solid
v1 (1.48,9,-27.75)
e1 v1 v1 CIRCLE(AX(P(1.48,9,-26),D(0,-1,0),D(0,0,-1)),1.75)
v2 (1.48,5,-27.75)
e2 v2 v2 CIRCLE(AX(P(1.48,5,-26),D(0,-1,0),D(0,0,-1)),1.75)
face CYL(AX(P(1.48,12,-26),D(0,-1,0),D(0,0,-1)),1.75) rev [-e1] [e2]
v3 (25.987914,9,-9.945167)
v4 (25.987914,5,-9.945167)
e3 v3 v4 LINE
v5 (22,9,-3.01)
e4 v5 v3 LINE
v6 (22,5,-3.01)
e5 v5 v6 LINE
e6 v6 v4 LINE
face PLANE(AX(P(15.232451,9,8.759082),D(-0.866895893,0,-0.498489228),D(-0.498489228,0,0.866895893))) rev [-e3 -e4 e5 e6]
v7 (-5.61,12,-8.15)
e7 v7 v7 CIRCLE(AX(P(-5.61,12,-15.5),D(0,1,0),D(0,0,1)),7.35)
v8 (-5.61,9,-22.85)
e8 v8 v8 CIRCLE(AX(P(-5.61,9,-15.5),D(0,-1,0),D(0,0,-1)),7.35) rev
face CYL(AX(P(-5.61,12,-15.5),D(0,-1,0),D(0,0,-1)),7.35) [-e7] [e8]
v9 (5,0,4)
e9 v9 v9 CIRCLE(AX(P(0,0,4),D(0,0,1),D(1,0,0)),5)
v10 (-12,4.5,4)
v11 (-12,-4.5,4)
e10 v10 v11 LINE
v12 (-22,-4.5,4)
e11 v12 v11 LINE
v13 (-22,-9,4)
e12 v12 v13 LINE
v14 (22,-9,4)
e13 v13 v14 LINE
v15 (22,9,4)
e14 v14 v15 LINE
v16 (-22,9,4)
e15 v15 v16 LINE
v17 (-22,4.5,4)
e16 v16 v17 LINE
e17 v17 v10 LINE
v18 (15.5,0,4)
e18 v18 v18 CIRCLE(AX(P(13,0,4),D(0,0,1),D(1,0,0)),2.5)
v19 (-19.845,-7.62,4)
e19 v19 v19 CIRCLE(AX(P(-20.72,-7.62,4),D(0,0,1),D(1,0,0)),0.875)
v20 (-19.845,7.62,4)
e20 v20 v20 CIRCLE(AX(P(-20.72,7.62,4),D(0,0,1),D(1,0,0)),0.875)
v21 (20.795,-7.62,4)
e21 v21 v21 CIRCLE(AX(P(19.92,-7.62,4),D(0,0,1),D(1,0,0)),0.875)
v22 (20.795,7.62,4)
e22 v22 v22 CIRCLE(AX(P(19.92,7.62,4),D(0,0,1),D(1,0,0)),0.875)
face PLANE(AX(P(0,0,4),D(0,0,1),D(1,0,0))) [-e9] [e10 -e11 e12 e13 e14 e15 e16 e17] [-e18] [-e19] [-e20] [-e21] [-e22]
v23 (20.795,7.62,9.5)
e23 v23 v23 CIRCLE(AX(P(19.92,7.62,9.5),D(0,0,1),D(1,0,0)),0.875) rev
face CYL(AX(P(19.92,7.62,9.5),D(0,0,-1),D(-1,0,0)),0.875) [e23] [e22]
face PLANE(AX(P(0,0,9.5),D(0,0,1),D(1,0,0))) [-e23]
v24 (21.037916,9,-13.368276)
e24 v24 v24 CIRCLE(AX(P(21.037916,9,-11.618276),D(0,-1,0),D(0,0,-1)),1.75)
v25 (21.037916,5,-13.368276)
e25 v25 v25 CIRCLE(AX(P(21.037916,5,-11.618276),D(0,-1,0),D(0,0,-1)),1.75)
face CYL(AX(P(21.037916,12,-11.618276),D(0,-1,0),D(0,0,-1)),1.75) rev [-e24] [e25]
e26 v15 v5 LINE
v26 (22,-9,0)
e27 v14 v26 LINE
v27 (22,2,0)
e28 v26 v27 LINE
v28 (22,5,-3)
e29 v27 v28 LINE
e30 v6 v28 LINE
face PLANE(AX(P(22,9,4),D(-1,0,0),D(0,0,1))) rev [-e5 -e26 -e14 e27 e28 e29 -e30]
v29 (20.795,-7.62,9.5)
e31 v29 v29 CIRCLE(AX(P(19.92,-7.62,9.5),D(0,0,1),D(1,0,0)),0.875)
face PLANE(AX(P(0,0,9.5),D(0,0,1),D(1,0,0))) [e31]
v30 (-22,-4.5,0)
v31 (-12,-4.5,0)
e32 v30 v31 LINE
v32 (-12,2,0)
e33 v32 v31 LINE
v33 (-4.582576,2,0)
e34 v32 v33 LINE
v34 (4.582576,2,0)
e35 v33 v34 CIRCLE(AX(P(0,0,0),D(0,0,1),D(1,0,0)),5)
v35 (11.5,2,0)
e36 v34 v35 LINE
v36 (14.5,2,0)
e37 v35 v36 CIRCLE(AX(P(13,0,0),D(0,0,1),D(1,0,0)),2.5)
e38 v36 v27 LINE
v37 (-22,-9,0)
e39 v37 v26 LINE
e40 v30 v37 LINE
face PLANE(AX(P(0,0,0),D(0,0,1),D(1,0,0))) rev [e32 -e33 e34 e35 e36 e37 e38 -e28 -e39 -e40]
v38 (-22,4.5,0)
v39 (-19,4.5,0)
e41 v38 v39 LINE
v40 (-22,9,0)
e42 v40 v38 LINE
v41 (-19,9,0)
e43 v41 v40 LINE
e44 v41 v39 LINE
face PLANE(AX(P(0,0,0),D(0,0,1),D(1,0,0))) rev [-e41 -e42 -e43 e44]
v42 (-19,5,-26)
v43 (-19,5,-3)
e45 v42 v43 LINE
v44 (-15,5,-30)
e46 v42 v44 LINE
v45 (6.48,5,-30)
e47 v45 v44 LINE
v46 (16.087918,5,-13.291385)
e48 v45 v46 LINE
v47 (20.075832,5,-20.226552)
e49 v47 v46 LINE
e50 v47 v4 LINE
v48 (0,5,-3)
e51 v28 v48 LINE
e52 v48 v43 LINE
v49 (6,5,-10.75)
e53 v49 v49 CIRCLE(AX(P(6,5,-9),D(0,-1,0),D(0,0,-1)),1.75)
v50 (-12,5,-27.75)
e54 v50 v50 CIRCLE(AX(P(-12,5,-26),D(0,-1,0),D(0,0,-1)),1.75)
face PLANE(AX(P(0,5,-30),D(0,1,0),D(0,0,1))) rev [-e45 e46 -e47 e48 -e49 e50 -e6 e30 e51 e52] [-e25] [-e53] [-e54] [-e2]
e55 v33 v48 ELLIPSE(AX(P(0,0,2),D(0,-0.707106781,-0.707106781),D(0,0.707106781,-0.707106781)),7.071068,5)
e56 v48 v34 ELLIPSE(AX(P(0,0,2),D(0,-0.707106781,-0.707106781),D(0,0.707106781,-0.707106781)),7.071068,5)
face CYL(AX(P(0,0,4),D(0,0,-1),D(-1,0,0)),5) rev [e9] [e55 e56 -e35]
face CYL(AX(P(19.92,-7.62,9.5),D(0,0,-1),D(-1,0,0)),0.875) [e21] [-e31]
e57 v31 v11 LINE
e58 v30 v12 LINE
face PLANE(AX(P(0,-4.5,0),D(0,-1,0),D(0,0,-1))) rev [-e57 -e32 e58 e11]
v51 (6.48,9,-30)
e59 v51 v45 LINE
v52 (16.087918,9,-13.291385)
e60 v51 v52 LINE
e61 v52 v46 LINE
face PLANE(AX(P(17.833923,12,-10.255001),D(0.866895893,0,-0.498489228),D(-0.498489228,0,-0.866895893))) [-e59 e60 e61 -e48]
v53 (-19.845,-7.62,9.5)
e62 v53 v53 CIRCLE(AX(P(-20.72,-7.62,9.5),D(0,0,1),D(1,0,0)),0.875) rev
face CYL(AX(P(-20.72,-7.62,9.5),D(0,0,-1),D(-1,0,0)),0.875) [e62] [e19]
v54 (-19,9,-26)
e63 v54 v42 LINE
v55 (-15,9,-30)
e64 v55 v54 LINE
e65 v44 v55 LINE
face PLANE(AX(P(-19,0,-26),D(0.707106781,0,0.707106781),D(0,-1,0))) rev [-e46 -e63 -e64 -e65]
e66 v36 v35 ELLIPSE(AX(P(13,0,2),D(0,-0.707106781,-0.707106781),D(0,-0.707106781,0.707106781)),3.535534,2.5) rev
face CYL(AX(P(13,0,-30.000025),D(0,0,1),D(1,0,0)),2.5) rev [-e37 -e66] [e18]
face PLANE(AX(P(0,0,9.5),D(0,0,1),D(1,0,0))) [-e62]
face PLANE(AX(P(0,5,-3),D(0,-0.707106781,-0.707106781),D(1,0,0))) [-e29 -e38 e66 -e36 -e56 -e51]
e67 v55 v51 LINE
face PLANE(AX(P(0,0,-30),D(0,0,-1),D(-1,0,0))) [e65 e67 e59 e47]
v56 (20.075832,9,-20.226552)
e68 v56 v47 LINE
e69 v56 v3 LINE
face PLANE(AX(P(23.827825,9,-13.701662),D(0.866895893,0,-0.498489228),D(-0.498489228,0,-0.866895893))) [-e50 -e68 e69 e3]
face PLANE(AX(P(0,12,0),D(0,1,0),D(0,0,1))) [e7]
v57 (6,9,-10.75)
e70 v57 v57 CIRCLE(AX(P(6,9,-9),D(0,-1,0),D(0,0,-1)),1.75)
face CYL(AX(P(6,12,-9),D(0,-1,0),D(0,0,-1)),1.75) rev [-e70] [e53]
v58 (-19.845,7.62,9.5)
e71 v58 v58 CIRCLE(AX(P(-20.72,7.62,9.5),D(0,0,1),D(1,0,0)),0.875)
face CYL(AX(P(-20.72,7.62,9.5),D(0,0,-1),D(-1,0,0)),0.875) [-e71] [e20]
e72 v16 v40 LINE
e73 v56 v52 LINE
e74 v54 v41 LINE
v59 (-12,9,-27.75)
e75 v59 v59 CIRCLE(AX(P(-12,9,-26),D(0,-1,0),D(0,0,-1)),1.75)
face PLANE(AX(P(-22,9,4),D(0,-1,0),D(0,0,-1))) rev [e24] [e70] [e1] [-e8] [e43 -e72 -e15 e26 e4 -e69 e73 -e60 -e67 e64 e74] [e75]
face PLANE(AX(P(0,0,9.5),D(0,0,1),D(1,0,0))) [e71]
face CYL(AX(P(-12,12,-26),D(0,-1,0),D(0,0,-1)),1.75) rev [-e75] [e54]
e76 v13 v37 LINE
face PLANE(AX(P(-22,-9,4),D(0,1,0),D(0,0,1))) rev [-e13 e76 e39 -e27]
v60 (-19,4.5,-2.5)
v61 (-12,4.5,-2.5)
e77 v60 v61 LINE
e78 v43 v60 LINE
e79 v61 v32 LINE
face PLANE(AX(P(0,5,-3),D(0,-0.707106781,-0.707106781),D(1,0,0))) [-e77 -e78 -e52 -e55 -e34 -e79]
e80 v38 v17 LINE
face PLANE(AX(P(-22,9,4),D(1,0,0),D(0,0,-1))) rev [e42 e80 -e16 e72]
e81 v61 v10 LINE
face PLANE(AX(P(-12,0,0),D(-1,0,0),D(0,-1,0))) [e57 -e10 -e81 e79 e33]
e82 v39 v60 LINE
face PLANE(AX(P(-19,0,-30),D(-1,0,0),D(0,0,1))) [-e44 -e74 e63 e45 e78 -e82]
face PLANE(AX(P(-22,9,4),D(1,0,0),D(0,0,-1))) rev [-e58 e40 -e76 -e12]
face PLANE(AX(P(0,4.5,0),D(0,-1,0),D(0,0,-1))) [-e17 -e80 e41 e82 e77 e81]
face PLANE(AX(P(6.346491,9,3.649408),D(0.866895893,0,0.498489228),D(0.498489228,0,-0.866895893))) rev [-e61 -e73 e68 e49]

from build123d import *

# Parameters (mm, degrees)
SKETCH_1_W          = 44
SKETCH_1_H          = 18
SKETCH_1_R          = 5
EXTRUDE_1_DEPTH     = 4
SKETCH_2_W          = 10
SKETCH_2_H          = 9
CUT_EXTRUDE_1_DEPTH = 25.103941586
SKETCH_3_R          = 0.875
EXTRUDE_2_DEPTH     = 5.5
SKETCH_4_W          = 41
SKETCH_4_H          = 4
EXTRUDE_3_DEPTH     = 30
SKETCH_5_R          = 7.35
EXTRUDE_4_DEPTH     = 3
CUT_EXTRUDE_2_DEPTH = 40.749213829
EXTRUDE_6_DEPTH     = 4
SKETCH_8_R          = 1.75
CUT_EXTRUDE_3_DEPTH = 43.087666423
CHAMFER_1_SIZE      = 3
SKETCH_9_R          = 2.5
CUT_EXTRUDE_5_DEPTH = 45.445153447
CHAMFER_2_SIZE      = 4


with BuildPart() as part:
    # Эскиз1 → Бобышка-Вытянуть1 (new body)
    with BuildSketch(Plane.XY):
        Rectangle(SKETCH_1_W, SKETCH_1_H)
        Circle(SKETCH_1_R, mode=Mode.SUBTRACT)
    extrude(amount=EXTRUDE_1_DEPTH)

    # Эскиз2 → Вырез-Вытянуть1 (cut, through all)
    with BuildSketch(Plane.XY.offset(4)):
        with Locations((-17, 0)):
            Rectangle(SKETCH_2_W, SKETCH_2_H)
    extrude(amount=-CUT_EXTRUDE_1_DEPTH, mode=Mode.SUBTRACT)

    # Эскиз3 → Бобышка-Вытянуть2 (add)
    with BuildSketch(Plane.XY.offset(4)):
        with Locations((-20.72, 7.62)):
            Circle(SKETCH_3_R)
        with Locations((-20.72, -7.62)):
            Circle(SKETCH_3_R)
        with Locations((19.92, -7.62)):
            Circle(SKETCH_3_R)
        with Locations((19.92, 7.62)):
            Circle(SKETCH_3_R)
    extrude(amount=EXTRUDE_2_DEPTH)

    # Эскиз4 → Бобышка-Вытянуть3 (add)
    with BuildSketch(Plane(origin=(0, 0, 0), x_dir=(-1, 0, 0), z_dir=(0, 0, -1))):
        with Locations((-1.5, 7)):
            Rectangle(SKETCH_4_W, SKETCH_4_H)
    extrude(amount=EXTRUDE_3_DEPTH)

    # Эскиз5 → Бобышка-Вытянуть4 (add)
    with BuildSketch(Plane(origin=(0, 9, 0), x_dir=(1, 0, 0), z_dir=(0, 1, 0))):
        with Locations(Location((-5.61, 15.5, 0), (0, 0, 90))):
            Circle(SKETCH_5_R)
    extrude(amount=EXTRUDE_4_DEPTH)

    # Эскиз6 → Вырез-Вытянуть2 (cut, through all)
    with BuildSketch(Plane.XZ.offset(-5)):
        Polygon((22, -3.01), (6.48, -30), (22, -30), align=None)
    extrude(amount=-CUT_EXTRUDE_2_DEPTH, mode=Mode.SUBTRACT)

    # Эскиз7 → Бобышка-Вытянуть6 (add)
    with BuildSketch(Plane.XZ.offset(-5)):
        Polygon((25.987913824, -9.945167145), (22, -3.01), (16.087917757, -13.291385293), (20.07583158, -20.226552439), align=None)
    extrude(amount=-EXTRUDE_6_DEPTH)

    # Эскиз8 → Вырез-Вытянуть3 (cut, through all)
    with BuildSketch(Plane.XZ.offset(-5)):
        with Locations(Location((21.03791579, -11.618276219, 0), (0, 0, 270))):
            Circle(SKETCH_8_R)
        with Locations(Location((-12, -26, 0), (0, 0, 270))):
            Circle(SKETCH_8_R)
        with Locations(Location((1.48, -26, 0), (0, 0, 270))):
            Circle(SKETCH_8_R)
        with Locations(Location((6, -9, 0), (0, 0, 270))):
            Circle(SKETCH_8_R)
    extrude(amount=-CUT_EXTRUDE_3_DEPTH, mode=Mode.SUBTRACT)

    # Фаска1
    # the kernel refuses this chamfer: 3 mm, written as the material it adds along each edge
    with BuildSketch(Plane(origin=(2.6e-08, 5, 0), x_dir=(0, -0.9996219169112968, 0.027495876610586372), z_dir=(-1, 0, 0))) as chamfer_1_piece_1_section:
        Polygon((CHAMFER_1_SIZE * 0.999621916911, -CHAMFER_1_SIZE * 0.0274958766106), (-CHAMFER_1_SIZE * 0.0274958766106, -CHAMFER_1_SIZE * 0.999621916911), (0, 0), align=None)
    chamfer_1_piece_1 = extrude(amount=26.71504899, mode=Mode.PRIVATE)
    chamfer_1_piece_1 = split(chamfer_1_piece_1, bisect_by=Plane(origin=(-12, 3.70825936, -0.85412968), z_dir=(1, 0, 0)), keep=Keep.TOP, mode=Mode.PRIVATE)
    chamfer_1_piece_1 = chamfer_1_piece_1 - Plane(origin=(0, 0, -0.85412968), x_dir=(1, 0, 0), z_dir=(0, 0, -1)) * Cylinder(5, 66, mode=Mode.PRIVATE)
    add(chamfer_1_piece_1)
    with BuildSketch(Plane(origin=(2.6e-08, 5, 0), x_dir=(0, -0.9996219169112968, 0.027495876610586372), z_dir=(-1, 0, 0))) as chamfer_1_piece_2_section:
        Polygon((CHAMFER_1_SIZE * 0.999621916911, -CHAMFER_1_SIZE * 0.0274958766106), (-CHAMFER_1_SIZE * 0.0274958766106, -CHAMFER_1_SIZE * 0.999621916911), (0, 0), align=None)
    chamfer_1_piece_2 = extrude(amount=19.000000026, mode=Mode.PRIVATE)
    chamfer_1_piece_2 = split(chamfer_1_piece_2, bisect_by=Plane(origin=(-15.5, 4.5, -1.378787879), z_dir=(0, 1, 0)), keep=Keep.TOP, mode=Mode.PRIVATE)
    chamfer_1_piece_2 = split(chamfer_1_piece_2, bisect_by=Plane(origin=(-12, 4.757575758, -1.378787879), z_dir=(-1, 0, 0)), keep=Keep.TOP, mode=Mode.PRIVATE)
    add(chamfer_1_piece_2)
    with BuildSketch(Plane(origin=(22, 5, 0), x_dir=(0, -0.9996219169112968, 0.027495876610586372), z_dir=(-1, 0, 0))) as chamfer_1_piece_3_section:
        Polygon((CHAMFER_1_SIZE * 0.999621916911, -CHAMFER_1_SIZE * 0.0274958766106), (-CHAMFER_1_SIZE * 0.0274958766106, -CHAMFER_1_SIZE * 0.999621916911), (0, 0), align=None)
    chamfer_1_piece_3 = extrude(amount=21.999999974, mode=Mode.PRIVATE)
    chamfer_1_piece_3 = chamfer_1_piece_3 - Plane(origin=(0, 0, -1.018193592), x_dir=(1, 0, 0), z_dir=(0, 0, -1)) * Cylinder(5, 56, mode=Mode.PRIVATE)
    add(chamfer_1_piece_3)

    # Эскиз9 → Вырез-Вытянуть5 (cut, through all)
    with BuildSketch(Plane.XY.offset(4)):
        with Locations((13, 0)):
            Circle(SKETCH_9_R)
    extrude(amount=-CUT_EXTRUDE_5_DEPTH, mode=Mode.SUBTRACT)

    # Фаска2
    chamfer_2_edges = [part.edges().sort_by_distance(p)[0] for p in [
        (-19, 7, -30),
    ]]
    chamfer(chamfer_2_edges, length=CHAMFER_2_SIZE)


solid = part.part
